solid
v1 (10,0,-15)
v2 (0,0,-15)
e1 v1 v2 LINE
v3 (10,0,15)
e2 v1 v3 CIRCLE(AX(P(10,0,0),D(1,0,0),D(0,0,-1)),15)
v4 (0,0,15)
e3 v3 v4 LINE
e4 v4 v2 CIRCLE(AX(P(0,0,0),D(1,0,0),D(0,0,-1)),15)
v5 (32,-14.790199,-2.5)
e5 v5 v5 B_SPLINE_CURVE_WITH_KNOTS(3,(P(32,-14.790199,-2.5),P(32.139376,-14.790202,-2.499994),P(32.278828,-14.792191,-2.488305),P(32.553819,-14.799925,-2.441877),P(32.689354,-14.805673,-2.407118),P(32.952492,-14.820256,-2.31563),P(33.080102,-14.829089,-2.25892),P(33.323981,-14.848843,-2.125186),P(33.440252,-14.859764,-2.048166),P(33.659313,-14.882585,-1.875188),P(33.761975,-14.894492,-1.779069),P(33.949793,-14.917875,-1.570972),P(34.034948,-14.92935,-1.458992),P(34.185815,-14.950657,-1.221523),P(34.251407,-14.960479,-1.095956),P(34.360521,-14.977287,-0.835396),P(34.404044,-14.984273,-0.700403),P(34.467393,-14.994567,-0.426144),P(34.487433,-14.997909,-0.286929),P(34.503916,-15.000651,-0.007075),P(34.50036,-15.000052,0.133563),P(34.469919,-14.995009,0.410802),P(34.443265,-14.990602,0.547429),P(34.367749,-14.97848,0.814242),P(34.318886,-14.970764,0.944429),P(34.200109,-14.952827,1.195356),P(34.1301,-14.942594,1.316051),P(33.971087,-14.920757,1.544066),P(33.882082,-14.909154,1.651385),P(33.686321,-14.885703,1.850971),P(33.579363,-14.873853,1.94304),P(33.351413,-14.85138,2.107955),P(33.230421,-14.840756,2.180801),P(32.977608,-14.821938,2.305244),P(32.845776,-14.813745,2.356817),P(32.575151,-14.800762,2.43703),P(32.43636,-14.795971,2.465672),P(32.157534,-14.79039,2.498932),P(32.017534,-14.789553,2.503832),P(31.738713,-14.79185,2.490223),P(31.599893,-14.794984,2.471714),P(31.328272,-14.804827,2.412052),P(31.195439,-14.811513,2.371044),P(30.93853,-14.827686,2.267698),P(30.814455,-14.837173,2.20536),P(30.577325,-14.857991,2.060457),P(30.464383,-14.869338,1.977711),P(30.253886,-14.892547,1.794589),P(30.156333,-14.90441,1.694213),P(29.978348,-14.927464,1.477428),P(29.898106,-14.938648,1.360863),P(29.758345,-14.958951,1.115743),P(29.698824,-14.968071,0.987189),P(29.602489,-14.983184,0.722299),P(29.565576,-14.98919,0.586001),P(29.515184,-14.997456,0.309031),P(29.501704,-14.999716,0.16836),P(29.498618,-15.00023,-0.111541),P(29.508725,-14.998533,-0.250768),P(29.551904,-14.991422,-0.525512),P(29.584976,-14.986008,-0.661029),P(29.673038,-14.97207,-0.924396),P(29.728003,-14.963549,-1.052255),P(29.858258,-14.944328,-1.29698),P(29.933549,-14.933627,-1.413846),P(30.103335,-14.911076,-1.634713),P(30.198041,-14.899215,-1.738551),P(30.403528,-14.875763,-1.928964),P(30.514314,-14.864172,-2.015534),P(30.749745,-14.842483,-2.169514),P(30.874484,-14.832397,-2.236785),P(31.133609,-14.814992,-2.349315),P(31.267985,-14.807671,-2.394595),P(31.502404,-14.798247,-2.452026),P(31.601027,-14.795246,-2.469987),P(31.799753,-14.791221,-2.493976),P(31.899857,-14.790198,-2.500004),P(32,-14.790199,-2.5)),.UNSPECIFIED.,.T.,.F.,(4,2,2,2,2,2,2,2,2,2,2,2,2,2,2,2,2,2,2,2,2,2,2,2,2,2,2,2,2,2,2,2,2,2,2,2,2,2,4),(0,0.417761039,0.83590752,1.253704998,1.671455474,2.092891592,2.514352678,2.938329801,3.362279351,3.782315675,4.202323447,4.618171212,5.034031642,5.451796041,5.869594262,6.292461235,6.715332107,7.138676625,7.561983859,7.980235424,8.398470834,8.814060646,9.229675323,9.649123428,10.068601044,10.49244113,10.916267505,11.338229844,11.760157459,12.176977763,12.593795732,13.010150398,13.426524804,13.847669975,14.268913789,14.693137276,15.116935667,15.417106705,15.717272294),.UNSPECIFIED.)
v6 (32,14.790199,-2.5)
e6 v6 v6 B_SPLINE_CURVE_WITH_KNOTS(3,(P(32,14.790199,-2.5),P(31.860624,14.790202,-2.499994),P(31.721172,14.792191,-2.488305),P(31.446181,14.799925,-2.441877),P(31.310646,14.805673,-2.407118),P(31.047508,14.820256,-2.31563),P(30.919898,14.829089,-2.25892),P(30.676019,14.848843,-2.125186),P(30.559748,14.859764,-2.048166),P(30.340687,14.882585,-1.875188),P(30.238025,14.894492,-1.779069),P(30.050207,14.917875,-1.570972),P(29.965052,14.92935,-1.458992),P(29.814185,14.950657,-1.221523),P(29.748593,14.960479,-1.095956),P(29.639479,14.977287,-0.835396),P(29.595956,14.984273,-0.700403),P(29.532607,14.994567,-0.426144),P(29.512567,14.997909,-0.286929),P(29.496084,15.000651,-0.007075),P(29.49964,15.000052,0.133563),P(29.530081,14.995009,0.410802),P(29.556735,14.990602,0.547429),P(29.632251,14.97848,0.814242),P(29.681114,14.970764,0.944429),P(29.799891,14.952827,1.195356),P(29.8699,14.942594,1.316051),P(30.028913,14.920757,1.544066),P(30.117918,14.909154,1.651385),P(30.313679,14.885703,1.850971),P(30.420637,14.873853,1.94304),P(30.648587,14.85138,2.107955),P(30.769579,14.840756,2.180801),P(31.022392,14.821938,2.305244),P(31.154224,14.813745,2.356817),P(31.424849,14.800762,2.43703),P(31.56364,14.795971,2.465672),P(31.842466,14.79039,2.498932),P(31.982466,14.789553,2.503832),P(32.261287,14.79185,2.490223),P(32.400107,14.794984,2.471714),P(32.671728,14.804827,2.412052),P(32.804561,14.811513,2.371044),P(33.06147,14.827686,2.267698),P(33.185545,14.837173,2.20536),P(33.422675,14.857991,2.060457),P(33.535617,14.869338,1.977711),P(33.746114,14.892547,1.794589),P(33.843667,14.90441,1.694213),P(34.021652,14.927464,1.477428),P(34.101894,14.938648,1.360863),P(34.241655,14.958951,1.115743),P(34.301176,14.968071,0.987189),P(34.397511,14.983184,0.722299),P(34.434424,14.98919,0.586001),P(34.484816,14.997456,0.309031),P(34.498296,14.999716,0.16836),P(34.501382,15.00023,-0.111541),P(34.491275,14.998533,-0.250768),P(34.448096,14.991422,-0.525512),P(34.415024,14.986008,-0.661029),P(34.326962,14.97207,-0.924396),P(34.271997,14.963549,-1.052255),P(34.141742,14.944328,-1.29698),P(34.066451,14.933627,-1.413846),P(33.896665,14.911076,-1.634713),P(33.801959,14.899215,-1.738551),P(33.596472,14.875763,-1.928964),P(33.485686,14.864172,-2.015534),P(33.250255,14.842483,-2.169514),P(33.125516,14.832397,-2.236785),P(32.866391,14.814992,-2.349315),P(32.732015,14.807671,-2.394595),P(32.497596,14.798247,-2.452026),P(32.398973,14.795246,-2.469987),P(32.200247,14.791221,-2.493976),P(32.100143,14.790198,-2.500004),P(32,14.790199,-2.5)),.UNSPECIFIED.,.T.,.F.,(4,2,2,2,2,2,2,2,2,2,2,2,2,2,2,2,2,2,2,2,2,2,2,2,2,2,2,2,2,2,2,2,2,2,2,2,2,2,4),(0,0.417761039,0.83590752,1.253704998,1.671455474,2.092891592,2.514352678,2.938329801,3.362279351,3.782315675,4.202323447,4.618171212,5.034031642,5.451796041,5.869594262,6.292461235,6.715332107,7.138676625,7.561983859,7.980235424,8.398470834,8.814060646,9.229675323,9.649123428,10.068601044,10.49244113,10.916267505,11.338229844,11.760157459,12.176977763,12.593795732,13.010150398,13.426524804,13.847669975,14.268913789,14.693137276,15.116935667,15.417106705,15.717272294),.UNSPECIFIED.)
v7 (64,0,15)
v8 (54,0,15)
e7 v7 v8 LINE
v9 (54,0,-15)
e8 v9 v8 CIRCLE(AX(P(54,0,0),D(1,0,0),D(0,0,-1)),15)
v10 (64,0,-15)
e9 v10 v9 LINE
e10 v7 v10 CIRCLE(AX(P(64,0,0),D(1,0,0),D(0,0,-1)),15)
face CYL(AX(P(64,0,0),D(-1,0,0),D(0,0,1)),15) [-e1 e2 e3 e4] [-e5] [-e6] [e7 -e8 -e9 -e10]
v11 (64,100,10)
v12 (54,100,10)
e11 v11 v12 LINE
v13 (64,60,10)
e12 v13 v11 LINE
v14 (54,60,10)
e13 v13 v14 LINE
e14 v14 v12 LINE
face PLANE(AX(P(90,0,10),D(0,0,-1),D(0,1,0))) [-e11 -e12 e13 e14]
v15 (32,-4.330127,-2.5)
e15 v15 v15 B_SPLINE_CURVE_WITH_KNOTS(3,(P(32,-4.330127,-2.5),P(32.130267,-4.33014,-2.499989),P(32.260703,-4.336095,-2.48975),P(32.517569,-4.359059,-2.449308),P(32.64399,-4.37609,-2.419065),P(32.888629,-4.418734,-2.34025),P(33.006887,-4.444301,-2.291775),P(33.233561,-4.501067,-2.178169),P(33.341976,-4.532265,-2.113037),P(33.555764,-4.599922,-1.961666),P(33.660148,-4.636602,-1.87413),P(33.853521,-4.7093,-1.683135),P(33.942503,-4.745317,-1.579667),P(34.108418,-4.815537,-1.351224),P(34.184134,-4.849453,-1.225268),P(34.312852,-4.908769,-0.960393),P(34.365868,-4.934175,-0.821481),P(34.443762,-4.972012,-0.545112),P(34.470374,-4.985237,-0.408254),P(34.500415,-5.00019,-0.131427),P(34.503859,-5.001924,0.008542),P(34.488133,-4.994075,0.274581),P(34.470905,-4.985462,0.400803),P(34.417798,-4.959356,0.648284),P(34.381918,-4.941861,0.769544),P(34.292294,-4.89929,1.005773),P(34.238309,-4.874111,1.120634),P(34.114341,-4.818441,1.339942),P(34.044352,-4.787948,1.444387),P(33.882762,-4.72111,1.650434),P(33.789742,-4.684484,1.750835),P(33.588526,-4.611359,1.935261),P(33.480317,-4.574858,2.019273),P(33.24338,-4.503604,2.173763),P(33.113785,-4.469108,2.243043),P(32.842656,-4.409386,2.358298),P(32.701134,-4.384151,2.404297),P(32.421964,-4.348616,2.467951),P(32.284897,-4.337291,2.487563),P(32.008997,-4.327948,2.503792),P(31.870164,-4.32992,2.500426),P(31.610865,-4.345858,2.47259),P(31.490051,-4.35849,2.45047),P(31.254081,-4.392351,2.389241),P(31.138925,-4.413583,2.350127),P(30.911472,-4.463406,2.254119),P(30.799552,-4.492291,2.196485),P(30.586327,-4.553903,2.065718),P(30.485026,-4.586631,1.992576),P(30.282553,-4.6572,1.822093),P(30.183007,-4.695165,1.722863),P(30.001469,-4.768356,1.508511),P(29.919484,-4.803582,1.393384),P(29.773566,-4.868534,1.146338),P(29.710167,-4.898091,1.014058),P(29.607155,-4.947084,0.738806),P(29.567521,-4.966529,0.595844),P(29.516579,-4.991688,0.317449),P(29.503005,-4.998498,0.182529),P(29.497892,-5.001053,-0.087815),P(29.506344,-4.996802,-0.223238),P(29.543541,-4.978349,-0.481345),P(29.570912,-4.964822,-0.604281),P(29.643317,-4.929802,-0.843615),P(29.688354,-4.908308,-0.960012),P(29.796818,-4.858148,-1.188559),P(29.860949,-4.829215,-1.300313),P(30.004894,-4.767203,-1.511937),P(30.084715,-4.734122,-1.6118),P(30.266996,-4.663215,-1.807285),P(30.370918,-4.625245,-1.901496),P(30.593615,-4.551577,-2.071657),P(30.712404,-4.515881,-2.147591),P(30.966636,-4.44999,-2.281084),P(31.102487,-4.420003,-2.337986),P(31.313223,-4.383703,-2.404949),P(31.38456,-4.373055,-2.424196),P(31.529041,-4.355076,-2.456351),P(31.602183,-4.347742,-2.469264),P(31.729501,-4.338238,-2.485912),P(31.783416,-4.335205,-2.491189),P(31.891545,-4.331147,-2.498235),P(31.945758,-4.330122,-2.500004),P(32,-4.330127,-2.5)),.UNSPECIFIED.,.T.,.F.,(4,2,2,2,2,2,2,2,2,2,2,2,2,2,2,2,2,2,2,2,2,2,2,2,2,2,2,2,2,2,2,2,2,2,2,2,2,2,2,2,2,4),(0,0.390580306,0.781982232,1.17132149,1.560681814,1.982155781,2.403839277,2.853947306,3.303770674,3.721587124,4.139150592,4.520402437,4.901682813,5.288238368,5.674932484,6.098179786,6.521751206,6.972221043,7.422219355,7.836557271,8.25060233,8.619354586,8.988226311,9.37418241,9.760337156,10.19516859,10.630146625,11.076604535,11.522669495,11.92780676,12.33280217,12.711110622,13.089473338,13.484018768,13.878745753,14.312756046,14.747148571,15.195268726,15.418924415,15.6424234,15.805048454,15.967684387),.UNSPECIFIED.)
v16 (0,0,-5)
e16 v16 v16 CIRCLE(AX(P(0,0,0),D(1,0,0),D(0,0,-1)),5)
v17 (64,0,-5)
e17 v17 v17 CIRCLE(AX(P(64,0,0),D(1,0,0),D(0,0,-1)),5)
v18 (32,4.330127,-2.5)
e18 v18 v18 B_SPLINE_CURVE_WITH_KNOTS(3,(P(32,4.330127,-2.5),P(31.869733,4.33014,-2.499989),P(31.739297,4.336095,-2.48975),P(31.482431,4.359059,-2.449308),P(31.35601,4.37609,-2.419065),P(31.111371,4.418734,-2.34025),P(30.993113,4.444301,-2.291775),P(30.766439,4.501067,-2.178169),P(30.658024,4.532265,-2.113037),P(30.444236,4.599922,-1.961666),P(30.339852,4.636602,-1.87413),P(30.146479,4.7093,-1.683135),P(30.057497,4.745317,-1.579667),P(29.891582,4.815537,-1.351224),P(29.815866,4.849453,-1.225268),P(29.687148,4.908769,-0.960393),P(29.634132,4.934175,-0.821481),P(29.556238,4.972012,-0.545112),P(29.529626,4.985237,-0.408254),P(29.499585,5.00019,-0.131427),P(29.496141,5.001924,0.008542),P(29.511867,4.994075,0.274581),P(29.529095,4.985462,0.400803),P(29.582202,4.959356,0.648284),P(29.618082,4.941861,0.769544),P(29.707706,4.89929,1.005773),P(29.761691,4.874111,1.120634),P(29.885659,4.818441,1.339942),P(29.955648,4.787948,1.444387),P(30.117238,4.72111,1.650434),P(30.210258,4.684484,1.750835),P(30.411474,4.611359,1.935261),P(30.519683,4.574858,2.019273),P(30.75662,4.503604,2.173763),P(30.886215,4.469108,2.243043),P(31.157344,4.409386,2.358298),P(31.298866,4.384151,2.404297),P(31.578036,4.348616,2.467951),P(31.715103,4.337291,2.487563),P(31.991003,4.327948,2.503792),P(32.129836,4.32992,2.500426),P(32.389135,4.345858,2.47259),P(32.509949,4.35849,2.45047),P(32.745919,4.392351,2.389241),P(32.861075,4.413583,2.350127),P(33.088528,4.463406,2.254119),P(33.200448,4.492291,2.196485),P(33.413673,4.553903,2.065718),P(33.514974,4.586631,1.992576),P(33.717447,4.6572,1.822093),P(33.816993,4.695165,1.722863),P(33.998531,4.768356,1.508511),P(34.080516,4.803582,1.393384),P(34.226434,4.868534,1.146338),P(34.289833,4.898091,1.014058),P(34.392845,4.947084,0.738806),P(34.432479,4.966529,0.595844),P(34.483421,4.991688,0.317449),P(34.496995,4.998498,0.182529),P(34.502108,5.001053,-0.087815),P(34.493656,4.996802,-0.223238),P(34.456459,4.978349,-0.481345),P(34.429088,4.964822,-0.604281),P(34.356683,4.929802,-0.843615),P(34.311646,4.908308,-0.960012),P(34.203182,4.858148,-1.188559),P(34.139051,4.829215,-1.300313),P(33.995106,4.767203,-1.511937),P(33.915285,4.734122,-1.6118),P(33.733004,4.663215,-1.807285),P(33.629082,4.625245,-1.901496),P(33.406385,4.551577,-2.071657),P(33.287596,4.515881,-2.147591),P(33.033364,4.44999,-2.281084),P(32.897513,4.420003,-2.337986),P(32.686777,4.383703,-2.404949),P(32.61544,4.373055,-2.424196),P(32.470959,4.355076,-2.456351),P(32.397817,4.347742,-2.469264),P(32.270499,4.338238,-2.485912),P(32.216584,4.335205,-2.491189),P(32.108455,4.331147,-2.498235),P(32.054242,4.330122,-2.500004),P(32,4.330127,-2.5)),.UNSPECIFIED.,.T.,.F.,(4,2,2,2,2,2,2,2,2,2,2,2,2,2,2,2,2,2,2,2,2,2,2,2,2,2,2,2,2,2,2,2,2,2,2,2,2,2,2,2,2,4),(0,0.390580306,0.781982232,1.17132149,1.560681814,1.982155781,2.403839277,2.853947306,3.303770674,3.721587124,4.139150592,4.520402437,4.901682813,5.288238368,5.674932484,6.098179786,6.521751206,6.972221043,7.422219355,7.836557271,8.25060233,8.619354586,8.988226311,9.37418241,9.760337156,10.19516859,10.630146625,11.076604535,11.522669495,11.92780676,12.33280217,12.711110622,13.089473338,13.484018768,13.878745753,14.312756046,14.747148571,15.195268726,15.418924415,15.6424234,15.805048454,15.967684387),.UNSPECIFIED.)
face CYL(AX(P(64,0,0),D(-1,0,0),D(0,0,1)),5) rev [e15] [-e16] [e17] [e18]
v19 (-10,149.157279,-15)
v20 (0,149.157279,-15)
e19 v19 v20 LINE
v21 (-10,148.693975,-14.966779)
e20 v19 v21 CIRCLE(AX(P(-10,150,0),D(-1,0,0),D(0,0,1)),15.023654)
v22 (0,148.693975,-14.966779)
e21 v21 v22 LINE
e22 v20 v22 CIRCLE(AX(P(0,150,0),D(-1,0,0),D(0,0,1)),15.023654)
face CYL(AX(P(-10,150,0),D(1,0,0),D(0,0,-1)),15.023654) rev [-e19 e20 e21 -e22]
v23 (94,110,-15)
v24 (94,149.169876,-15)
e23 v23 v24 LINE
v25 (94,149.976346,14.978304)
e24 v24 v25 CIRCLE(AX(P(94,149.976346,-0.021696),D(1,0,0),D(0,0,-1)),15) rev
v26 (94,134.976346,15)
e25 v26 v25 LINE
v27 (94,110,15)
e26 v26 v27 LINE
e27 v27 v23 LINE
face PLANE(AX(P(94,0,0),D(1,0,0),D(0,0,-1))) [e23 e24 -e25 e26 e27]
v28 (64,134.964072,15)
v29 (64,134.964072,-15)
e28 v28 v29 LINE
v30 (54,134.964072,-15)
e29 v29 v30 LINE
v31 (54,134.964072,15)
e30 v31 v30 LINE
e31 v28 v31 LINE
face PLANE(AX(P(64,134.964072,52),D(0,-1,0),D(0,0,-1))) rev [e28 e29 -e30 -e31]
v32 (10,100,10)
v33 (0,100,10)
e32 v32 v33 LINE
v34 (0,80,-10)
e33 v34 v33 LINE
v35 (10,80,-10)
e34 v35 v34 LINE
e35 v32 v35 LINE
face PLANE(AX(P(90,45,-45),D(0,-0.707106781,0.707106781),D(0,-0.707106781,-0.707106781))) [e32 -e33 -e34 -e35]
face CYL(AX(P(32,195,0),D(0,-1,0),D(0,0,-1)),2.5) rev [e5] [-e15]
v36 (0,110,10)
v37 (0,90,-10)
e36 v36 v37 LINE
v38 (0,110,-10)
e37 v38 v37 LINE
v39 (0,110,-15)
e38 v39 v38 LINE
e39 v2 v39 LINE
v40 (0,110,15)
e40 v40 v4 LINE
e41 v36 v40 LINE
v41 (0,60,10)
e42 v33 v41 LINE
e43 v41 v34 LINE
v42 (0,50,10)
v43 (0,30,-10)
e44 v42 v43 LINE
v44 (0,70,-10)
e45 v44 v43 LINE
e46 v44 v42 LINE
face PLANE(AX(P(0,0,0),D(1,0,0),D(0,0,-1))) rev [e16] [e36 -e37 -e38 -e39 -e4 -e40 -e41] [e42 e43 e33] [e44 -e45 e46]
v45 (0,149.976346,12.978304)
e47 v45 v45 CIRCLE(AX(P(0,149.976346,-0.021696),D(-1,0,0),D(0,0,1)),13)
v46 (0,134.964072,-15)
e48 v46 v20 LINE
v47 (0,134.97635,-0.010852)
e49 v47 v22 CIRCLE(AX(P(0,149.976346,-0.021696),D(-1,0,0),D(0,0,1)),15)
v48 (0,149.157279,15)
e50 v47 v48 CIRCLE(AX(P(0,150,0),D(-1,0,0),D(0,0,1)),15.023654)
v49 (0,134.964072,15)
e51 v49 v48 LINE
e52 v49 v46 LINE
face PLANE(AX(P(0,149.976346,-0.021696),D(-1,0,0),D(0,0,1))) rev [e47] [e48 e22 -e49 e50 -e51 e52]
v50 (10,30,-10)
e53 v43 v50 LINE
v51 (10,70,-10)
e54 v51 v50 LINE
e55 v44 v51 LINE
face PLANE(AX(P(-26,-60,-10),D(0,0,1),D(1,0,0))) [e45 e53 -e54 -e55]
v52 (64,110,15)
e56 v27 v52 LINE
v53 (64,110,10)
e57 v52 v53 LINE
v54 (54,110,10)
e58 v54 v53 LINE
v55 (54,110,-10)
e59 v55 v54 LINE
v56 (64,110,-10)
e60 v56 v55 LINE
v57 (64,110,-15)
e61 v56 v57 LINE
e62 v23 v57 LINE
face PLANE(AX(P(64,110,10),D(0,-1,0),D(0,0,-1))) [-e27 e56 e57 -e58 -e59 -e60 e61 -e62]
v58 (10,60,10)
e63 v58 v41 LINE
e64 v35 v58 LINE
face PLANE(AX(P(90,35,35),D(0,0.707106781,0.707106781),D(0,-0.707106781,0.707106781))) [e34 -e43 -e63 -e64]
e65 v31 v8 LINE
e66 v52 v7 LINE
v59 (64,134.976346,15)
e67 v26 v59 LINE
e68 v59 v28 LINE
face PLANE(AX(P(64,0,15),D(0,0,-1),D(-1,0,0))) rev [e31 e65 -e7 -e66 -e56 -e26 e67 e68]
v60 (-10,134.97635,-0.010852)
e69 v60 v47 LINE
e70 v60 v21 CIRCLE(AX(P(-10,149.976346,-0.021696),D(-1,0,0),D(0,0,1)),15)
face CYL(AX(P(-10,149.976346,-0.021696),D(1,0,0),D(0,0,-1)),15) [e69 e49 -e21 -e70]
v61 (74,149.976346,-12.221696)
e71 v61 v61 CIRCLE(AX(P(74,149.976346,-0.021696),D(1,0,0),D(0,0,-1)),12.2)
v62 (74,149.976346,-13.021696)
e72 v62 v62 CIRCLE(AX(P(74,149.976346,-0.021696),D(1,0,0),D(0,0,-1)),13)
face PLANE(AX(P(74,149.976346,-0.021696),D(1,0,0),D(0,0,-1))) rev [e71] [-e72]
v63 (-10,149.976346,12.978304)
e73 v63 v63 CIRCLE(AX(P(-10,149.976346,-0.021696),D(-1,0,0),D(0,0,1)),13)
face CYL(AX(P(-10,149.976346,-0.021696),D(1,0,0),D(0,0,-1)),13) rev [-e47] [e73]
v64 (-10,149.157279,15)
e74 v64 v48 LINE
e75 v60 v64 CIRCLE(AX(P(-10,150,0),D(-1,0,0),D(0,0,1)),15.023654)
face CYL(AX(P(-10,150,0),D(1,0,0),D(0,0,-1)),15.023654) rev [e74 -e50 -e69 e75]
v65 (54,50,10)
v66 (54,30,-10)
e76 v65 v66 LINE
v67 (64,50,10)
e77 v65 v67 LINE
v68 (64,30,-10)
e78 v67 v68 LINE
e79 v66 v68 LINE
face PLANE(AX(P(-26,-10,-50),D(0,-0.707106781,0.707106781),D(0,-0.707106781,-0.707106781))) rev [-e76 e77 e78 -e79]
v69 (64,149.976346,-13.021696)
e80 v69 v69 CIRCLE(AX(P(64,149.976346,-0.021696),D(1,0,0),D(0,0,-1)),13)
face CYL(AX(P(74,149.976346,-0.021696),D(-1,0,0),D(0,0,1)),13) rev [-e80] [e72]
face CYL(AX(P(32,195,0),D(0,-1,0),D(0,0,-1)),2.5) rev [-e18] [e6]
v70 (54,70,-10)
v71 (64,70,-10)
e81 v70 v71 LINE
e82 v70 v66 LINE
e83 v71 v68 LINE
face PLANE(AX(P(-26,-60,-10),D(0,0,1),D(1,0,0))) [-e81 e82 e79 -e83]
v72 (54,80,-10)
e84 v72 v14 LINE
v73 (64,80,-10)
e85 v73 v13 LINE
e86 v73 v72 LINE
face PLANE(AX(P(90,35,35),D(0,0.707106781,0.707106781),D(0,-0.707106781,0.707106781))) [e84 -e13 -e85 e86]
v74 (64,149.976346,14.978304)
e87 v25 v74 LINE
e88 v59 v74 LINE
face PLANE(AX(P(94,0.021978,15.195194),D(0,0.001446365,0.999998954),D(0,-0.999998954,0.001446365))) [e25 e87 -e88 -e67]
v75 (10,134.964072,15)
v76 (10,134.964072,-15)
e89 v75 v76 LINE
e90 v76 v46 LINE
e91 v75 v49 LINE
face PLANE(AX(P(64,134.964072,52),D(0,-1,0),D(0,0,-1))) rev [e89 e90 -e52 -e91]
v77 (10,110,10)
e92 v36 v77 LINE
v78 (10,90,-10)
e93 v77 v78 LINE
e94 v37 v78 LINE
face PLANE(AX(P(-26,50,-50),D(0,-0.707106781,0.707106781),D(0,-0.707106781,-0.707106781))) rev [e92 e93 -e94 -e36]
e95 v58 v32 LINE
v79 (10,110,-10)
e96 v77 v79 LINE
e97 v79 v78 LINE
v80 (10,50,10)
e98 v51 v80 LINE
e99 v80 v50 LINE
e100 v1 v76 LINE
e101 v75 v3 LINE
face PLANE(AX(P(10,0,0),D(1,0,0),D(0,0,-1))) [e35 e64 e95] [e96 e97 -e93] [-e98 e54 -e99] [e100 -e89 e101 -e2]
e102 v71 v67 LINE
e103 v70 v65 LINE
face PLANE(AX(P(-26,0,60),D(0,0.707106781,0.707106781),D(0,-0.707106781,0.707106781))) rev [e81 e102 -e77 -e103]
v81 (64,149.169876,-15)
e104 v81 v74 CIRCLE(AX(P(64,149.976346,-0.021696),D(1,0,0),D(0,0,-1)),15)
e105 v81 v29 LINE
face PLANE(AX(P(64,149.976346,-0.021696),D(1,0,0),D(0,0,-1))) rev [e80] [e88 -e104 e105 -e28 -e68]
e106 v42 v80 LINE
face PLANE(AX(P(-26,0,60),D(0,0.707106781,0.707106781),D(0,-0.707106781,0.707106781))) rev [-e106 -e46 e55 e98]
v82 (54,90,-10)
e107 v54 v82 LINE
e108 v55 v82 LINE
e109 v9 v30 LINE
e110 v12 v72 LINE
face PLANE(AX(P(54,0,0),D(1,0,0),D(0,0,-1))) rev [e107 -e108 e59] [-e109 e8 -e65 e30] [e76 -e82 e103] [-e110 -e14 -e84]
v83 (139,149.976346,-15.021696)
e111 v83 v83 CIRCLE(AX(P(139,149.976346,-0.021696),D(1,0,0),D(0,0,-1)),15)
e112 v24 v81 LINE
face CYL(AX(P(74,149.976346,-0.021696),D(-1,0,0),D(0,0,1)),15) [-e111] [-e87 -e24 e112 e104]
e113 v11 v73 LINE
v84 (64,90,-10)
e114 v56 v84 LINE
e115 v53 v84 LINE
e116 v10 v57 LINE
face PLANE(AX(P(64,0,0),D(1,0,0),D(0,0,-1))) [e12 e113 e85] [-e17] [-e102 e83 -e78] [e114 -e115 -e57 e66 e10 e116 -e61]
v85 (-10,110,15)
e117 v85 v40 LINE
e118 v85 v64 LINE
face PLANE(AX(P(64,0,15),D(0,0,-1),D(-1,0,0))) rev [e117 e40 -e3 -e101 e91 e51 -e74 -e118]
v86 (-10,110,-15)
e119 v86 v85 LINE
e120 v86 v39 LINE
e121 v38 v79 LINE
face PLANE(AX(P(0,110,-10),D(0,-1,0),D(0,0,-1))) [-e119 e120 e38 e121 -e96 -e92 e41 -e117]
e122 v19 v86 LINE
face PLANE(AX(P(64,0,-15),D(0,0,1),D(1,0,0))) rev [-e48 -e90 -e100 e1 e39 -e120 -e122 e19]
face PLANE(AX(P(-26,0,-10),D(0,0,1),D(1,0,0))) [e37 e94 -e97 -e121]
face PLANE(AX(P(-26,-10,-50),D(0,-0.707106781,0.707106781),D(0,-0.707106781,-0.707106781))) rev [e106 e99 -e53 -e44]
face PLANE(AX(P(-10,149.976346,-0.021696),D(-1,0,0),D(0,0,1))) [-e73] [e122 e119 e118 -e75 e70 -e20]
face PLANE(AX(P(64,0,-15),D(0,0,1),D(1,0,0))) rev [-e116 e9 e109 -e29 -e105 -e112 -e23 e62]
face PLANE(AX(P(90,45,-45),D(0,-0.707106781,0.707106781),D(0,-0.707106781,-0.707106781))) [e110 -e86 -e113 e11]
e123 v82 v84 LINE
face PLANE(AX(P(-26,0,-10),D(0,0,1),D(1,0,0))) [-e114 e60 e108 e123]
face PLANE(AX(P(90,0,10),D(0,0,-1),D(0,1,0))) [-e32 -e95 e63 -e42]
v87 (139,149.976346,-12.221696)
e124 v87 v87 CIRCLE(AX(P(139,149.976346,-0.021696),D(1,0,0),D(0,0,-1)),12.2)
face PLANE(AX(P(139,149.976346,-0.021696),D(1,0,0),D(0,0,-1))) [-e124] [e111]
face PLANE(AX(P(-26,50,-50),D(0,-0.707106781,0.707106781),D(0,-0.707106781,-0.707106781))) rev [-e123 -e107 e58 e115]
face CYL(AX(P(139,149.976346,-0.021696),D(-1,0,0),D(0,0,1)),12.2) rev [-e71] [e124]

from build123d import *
from build123d.topology import SkipClean

# Parameters (mm, degrees)
CROQUIS2_R                 = 5
SALIENTE_EXTRUIR2_DEPTH    = 64
VACIADO1_START             = 10
VACIADO1_DEPTH             = 44
CORTAR_EXTRUIR1_DEPTH      = 195
CORTAR_EXTRUIR1_DEPTH_BACK = 36
CROQUIS3_R                 = 2.5
CORTAR_EXTRUIR2_DEPTH      = 90
CORTAR_EXTRUIR3_DEPTH      = 90
MATRIZL1_COUNT             = 2
MATRIZL1_PITCH             = 60
CROQUIS7_R                 = 15
CROQUIS7_R_2               = 13
SALIENTE_EXTRUIR3_DEPTH    = 10
SALIENTE_EXTRUIR4_START    = 10
CROQUIS8_R                 = 15
CROQUIS8_R_2               = 13
SALIENTE_EXTRUIR4_DEPTH    = 10
SALIENTE_EXTRUIR5_START    = 65
CROQUIS9_R                 = 15
CROQUIS9_R_2               = 12.2
SALIENTE_EXTRUIR5_DEPTH    = 65
SALIENTE_EXTRUIR8_DEPTH    = 10
SALIENTE_EXTRUIR9_DEPTH    = 10
SALIENTE_EXTRUIR10_START   = 30
SALIENTE_EXTRUIR10_DEPTH   = 30
SALIENTE_EXTRUIR11_DEPTH   = 10
CROQUIS18_W                = 64
CROQUIS18_H                = 30.035928395
CORTAR_EXTRUIR4_DEPTH      = 67


# Read off the part's stored shape, not the designer's step: Vaciado1
with BuildPart() as part:
    # Croquis2 → Saliente-Extruir2 (new body)
    with BuildSketch(Plane(origin=(0, 0, 0), x_dir=(0, 0, -1), z_dir=(1, 0, 0))):
        with BuildLine():
            Line((15, 0), (15, 150))
            ThreePointArc((15, 150), (0, 165), (-15, 150))
            Line((-15, 150), (-15, 0))
            ThreePointArc((-15, 0), (0, -15), (15, 0))
        make_face()
        Circle(CROQUIS2_R, mode=Mode.SUBTRACT)
        with Locations((0, 150)):
            Circle(CROQUIS2_R, mode=Mode.SUBTRACT)
    extrude(amount=SALIENTE_EXTRUIR2_DEPTH)

    # Vaciado1 outline → Vaciado1 (cut)
    with SkipClean():  # the faces are left unmerged after this step: merging them gives an invalid solid
        with BuildSketch(Plane.YZ.offset(VACIADO1_START)):
            with BuildLine():
                ThreePointArc((0, 15), (15, 0), (0, -15))
                Line((0, -15), (150, -15))
                ThreePointArc((150, -15), (135, 0), (150, 15))
                Line((150, 15), (0, 15))
            make_face()
        extrude(amount=VACIADO1_DEPTH, mode=Mode.SUBTRACT)

    # Croquis3 → Cortar-Extruir1 (cut, two sides: drawn at the far end of the back side and taken through both)
    with SkipClean():  # the faces are left unmerged after this step: merging them gives an invalid solid
        with BuildSketch(Plane(origin=(0, 0, 0), x_dir=(1, 0, 0), z_dir=(0, 1, 0)).offset(-CORTAR_EXTRUIR1_DEPTH_BACK)):
            with Locations(Location((32, 0, 0), (0, 0, 90))):
                Circle(CROQUIS3_R)
        extrude(amount=CORTAR_EXTRUIR1_DEPTH + CORTAR_EXTRUIR1_DEPTH_BACK, mode=Mode.SUBTRACT)

    # Croquis4 → Cortar-Extruir2 (cut)
    with SkipClean():  # the faces are left unmerged after this step: merging them gives an invalid solid
        with BuildSketch(Plane(origin=(64, 0, 0), x_dir=(0, 0, -1), z_dir=(1, 0, 0))):
            Polygon((10, 90), (10, 130), (-10, 110), align=None)
        cortar_extruir2 = extrude(amount=-CORTAR_EXTRUIR2_DEPTH, mode=Mode.SUBTRACT)

    # Croquis5 → Cortar-Extruir3 (cut)
    with SkipClean():  # the faces are left unmerged after this step: merging them gives an invalid solid
        with BuildSketch(Plane.ZY):
            Polygon((10, 60), (-10, 80), (10, 100), align=None)
        extrude(amount=-CORTAR_EXTRUIR3_DEPTH, mode=Mode.SUBTRACT)

    # MatrizL1: Cortar-Extruir2 ×2
    with SkipClean():  # the faces are left unmerged after this step: merging them gives an invalid solid
        with Locations(*[(0, -i * MATRIZL1_PITCH, 0) for i in range(1, MATRIZL1_COUNT)]):
            add(cortar_extruir2, mode=Mode.SUBTRACT)

    # Croquis7 → Saliente-Extruir3 (add)
    with SkipClean():  # the faces are left unmerged after this step: merging them gives an invalid solid
        with BuildSketch(Plane.ZY):
            with Locations(Location((-0.021695503, 149.976346025, 0), (0, 0, 183.081975769))):
                Circle(CROQUIS7_R)
            with Locations((-0.021695503, 149.976346025)):
                Circle(CROQUIS7_R_2, mode=Mode.SUBTRACT)
        extrude(amount=SALIENTE_EXTRUIR3_DEPTH)

    # Croquis8 → Saliente-Extruir4 (add)
    with SkipClean():  # the faces are left unmerged after this step: merging them gives an invalid solid
        with BuildSketch(Plane(origin=(64, 0, 0), x_dir=(0, 0, -1), z_dir=(1, 0, 0)).offset(SALIENTE_EXTRUIR4_START)):
            with Locations(Location((0.021695503, 149.976346025, 0), (0, 0, 356.918024231))):
                Circle(CROQUIS8_R)
            with Locations(Location((0.021695503, 149.976346025, 0), (0, 0, 180))):
                Circle(CROQUIS8_R_2, mode=Mode.SUBTRACT)
        extrude(amount=-SALIENTE_EXTRUIR4_DEPTH)

    # Croquis9 → Saliente-Extruir5 (add)
    with SkipClean():  # the faces are left unmerged after this step: merging them gives an invalid solid
        with BuildSketch(Plane(origin=(74, 0, 0), x_dir=(0, 0, -1), z_dir=(1, 0, 0)).offset(SALIENTE_EXTRUIR5_START)):
            with Locations(Location((0.021695503, 149.976346025, 0), (0, 0, 356.918024231))):
                Circle(CROQUIS9_R)
            with Locations((0.021695503, 149.976346025)):
                Circle(CROQUIS9_R_2, mode=Mode.SUBTRACT)
        extrude(amount=-SALIENTE_EXTRUIR5_DEPTH)

    # Croquis14 → Saliente-Extruir8 (add)
    with SkipClean():  # the faces are left unmerged after this step: merging them gives an invalid solid
        with BuildSketch(Plane(origin=(10, 0, 0), x_dir=(0, 0, -1), z_dir=(1, 0, 0))):
            Polygon((-10, 110), (10, 130), (10, 110), align=None)
        extrude(amount=-SALIENTE_EXTRUIR8_DEPTH)

    # Croquis15 → Saliente-Extruir9 (add)
    with SkipClean():  # the faces are left unmerged after this step: merging them gives an invalid solid
        with BuildSketch(Plane.ZY.offset(-54)):
            Polygon((-10, 130), (10, 110), (-10, 110), align=None)
        extrude(amount=-SALIENTE_EXTRUIR9_DEPTH)

    # Croquis16 → Saliente-Extruir10 (add)
    with SkipClean():  # the faces are left unmerged after this step: merging them gives an invalid solid
        with BuildSketch(Plane(origin=(64, 0, 0), x_dir=(0, 0, -1), z_dir=(1, 0, 0)).offset(SALIENTE_EXTRUIR10_START)):
            with BuildLine():
                Line((-14.978304497, 149.976346025), (-15, 134.976346025))
                Line((-15, 134.976346025), (-15, 110))
                Line((-15, 110), (-10, 110))
                Line((-10, 110), (10, 110))
                Line((10, 110), (15, 110))
                Line((15, 110), (15, 134.976346025))
                Line((15, 134.976346025), (15, 149.169875698))
                ThreePointArc((15, 149.169875698), (-0.381685547, 134.981770882), (-14.978304497, 149.976346025))
            make_face()
        extrude(amount=-SALIENTE_EXTRUIR10_DEPTH)

    # Croquis17 → Saliente-Extruir11 (add)
    with SkipClean():  # the faces are left unmerged after this step: merging them gives an invalid solid
        with BuildSketch(Plane.ZY):
            with BuildLine():
                Line((-15, 134.976346025), (-15, 110))
                Line((-15, 110), (-10, 110))
                Line((-10, 110), (10, 110))
                Line((10, 110), (15, 110))
                Line((15, 110), (15, 134.976346025))
                Line((15, 134.976346025), (15, 149.157278959))
                ThreePointArc((15, 149.157278959), (10.317137497, 139.079063564), (-0.010852032, 134.976349945))
                ThreePointArc((-0.010852032, 134.976349945), (-10.160787766, 138.921989052), (-14.966779132, 148.69397505))
                ThreePointArc((-14.966779132, 148.69397505), (-14.985180196, 148.925498609), (-15, 149.157278959))
                Line((-15, 149.157278959), (-15, 134.976346025))
            make_face()
        extrude(amount=SALIENTE_EXTRUIR11_DEPTH)

    # Croquis18 → Cortar-Extruir4 (cut)
    with SkipClean():  # the faces are left unmerged after this step: merging them gives an invalid solid
        with BuildSketch(Plane(origin=(0, 0, -15), x_dir=(-1, 0, 0), z_dir=(0, 0, -1))):
            with Locations((-32, 149.982035803)):
                Rectangle(CROQUIS18_W, CROQUIS18_H)
        extrude(amount=-CORTAR_EXTRUIR4_DEPTH, mode=Mode.SUBTRACT)


solid = part.part
